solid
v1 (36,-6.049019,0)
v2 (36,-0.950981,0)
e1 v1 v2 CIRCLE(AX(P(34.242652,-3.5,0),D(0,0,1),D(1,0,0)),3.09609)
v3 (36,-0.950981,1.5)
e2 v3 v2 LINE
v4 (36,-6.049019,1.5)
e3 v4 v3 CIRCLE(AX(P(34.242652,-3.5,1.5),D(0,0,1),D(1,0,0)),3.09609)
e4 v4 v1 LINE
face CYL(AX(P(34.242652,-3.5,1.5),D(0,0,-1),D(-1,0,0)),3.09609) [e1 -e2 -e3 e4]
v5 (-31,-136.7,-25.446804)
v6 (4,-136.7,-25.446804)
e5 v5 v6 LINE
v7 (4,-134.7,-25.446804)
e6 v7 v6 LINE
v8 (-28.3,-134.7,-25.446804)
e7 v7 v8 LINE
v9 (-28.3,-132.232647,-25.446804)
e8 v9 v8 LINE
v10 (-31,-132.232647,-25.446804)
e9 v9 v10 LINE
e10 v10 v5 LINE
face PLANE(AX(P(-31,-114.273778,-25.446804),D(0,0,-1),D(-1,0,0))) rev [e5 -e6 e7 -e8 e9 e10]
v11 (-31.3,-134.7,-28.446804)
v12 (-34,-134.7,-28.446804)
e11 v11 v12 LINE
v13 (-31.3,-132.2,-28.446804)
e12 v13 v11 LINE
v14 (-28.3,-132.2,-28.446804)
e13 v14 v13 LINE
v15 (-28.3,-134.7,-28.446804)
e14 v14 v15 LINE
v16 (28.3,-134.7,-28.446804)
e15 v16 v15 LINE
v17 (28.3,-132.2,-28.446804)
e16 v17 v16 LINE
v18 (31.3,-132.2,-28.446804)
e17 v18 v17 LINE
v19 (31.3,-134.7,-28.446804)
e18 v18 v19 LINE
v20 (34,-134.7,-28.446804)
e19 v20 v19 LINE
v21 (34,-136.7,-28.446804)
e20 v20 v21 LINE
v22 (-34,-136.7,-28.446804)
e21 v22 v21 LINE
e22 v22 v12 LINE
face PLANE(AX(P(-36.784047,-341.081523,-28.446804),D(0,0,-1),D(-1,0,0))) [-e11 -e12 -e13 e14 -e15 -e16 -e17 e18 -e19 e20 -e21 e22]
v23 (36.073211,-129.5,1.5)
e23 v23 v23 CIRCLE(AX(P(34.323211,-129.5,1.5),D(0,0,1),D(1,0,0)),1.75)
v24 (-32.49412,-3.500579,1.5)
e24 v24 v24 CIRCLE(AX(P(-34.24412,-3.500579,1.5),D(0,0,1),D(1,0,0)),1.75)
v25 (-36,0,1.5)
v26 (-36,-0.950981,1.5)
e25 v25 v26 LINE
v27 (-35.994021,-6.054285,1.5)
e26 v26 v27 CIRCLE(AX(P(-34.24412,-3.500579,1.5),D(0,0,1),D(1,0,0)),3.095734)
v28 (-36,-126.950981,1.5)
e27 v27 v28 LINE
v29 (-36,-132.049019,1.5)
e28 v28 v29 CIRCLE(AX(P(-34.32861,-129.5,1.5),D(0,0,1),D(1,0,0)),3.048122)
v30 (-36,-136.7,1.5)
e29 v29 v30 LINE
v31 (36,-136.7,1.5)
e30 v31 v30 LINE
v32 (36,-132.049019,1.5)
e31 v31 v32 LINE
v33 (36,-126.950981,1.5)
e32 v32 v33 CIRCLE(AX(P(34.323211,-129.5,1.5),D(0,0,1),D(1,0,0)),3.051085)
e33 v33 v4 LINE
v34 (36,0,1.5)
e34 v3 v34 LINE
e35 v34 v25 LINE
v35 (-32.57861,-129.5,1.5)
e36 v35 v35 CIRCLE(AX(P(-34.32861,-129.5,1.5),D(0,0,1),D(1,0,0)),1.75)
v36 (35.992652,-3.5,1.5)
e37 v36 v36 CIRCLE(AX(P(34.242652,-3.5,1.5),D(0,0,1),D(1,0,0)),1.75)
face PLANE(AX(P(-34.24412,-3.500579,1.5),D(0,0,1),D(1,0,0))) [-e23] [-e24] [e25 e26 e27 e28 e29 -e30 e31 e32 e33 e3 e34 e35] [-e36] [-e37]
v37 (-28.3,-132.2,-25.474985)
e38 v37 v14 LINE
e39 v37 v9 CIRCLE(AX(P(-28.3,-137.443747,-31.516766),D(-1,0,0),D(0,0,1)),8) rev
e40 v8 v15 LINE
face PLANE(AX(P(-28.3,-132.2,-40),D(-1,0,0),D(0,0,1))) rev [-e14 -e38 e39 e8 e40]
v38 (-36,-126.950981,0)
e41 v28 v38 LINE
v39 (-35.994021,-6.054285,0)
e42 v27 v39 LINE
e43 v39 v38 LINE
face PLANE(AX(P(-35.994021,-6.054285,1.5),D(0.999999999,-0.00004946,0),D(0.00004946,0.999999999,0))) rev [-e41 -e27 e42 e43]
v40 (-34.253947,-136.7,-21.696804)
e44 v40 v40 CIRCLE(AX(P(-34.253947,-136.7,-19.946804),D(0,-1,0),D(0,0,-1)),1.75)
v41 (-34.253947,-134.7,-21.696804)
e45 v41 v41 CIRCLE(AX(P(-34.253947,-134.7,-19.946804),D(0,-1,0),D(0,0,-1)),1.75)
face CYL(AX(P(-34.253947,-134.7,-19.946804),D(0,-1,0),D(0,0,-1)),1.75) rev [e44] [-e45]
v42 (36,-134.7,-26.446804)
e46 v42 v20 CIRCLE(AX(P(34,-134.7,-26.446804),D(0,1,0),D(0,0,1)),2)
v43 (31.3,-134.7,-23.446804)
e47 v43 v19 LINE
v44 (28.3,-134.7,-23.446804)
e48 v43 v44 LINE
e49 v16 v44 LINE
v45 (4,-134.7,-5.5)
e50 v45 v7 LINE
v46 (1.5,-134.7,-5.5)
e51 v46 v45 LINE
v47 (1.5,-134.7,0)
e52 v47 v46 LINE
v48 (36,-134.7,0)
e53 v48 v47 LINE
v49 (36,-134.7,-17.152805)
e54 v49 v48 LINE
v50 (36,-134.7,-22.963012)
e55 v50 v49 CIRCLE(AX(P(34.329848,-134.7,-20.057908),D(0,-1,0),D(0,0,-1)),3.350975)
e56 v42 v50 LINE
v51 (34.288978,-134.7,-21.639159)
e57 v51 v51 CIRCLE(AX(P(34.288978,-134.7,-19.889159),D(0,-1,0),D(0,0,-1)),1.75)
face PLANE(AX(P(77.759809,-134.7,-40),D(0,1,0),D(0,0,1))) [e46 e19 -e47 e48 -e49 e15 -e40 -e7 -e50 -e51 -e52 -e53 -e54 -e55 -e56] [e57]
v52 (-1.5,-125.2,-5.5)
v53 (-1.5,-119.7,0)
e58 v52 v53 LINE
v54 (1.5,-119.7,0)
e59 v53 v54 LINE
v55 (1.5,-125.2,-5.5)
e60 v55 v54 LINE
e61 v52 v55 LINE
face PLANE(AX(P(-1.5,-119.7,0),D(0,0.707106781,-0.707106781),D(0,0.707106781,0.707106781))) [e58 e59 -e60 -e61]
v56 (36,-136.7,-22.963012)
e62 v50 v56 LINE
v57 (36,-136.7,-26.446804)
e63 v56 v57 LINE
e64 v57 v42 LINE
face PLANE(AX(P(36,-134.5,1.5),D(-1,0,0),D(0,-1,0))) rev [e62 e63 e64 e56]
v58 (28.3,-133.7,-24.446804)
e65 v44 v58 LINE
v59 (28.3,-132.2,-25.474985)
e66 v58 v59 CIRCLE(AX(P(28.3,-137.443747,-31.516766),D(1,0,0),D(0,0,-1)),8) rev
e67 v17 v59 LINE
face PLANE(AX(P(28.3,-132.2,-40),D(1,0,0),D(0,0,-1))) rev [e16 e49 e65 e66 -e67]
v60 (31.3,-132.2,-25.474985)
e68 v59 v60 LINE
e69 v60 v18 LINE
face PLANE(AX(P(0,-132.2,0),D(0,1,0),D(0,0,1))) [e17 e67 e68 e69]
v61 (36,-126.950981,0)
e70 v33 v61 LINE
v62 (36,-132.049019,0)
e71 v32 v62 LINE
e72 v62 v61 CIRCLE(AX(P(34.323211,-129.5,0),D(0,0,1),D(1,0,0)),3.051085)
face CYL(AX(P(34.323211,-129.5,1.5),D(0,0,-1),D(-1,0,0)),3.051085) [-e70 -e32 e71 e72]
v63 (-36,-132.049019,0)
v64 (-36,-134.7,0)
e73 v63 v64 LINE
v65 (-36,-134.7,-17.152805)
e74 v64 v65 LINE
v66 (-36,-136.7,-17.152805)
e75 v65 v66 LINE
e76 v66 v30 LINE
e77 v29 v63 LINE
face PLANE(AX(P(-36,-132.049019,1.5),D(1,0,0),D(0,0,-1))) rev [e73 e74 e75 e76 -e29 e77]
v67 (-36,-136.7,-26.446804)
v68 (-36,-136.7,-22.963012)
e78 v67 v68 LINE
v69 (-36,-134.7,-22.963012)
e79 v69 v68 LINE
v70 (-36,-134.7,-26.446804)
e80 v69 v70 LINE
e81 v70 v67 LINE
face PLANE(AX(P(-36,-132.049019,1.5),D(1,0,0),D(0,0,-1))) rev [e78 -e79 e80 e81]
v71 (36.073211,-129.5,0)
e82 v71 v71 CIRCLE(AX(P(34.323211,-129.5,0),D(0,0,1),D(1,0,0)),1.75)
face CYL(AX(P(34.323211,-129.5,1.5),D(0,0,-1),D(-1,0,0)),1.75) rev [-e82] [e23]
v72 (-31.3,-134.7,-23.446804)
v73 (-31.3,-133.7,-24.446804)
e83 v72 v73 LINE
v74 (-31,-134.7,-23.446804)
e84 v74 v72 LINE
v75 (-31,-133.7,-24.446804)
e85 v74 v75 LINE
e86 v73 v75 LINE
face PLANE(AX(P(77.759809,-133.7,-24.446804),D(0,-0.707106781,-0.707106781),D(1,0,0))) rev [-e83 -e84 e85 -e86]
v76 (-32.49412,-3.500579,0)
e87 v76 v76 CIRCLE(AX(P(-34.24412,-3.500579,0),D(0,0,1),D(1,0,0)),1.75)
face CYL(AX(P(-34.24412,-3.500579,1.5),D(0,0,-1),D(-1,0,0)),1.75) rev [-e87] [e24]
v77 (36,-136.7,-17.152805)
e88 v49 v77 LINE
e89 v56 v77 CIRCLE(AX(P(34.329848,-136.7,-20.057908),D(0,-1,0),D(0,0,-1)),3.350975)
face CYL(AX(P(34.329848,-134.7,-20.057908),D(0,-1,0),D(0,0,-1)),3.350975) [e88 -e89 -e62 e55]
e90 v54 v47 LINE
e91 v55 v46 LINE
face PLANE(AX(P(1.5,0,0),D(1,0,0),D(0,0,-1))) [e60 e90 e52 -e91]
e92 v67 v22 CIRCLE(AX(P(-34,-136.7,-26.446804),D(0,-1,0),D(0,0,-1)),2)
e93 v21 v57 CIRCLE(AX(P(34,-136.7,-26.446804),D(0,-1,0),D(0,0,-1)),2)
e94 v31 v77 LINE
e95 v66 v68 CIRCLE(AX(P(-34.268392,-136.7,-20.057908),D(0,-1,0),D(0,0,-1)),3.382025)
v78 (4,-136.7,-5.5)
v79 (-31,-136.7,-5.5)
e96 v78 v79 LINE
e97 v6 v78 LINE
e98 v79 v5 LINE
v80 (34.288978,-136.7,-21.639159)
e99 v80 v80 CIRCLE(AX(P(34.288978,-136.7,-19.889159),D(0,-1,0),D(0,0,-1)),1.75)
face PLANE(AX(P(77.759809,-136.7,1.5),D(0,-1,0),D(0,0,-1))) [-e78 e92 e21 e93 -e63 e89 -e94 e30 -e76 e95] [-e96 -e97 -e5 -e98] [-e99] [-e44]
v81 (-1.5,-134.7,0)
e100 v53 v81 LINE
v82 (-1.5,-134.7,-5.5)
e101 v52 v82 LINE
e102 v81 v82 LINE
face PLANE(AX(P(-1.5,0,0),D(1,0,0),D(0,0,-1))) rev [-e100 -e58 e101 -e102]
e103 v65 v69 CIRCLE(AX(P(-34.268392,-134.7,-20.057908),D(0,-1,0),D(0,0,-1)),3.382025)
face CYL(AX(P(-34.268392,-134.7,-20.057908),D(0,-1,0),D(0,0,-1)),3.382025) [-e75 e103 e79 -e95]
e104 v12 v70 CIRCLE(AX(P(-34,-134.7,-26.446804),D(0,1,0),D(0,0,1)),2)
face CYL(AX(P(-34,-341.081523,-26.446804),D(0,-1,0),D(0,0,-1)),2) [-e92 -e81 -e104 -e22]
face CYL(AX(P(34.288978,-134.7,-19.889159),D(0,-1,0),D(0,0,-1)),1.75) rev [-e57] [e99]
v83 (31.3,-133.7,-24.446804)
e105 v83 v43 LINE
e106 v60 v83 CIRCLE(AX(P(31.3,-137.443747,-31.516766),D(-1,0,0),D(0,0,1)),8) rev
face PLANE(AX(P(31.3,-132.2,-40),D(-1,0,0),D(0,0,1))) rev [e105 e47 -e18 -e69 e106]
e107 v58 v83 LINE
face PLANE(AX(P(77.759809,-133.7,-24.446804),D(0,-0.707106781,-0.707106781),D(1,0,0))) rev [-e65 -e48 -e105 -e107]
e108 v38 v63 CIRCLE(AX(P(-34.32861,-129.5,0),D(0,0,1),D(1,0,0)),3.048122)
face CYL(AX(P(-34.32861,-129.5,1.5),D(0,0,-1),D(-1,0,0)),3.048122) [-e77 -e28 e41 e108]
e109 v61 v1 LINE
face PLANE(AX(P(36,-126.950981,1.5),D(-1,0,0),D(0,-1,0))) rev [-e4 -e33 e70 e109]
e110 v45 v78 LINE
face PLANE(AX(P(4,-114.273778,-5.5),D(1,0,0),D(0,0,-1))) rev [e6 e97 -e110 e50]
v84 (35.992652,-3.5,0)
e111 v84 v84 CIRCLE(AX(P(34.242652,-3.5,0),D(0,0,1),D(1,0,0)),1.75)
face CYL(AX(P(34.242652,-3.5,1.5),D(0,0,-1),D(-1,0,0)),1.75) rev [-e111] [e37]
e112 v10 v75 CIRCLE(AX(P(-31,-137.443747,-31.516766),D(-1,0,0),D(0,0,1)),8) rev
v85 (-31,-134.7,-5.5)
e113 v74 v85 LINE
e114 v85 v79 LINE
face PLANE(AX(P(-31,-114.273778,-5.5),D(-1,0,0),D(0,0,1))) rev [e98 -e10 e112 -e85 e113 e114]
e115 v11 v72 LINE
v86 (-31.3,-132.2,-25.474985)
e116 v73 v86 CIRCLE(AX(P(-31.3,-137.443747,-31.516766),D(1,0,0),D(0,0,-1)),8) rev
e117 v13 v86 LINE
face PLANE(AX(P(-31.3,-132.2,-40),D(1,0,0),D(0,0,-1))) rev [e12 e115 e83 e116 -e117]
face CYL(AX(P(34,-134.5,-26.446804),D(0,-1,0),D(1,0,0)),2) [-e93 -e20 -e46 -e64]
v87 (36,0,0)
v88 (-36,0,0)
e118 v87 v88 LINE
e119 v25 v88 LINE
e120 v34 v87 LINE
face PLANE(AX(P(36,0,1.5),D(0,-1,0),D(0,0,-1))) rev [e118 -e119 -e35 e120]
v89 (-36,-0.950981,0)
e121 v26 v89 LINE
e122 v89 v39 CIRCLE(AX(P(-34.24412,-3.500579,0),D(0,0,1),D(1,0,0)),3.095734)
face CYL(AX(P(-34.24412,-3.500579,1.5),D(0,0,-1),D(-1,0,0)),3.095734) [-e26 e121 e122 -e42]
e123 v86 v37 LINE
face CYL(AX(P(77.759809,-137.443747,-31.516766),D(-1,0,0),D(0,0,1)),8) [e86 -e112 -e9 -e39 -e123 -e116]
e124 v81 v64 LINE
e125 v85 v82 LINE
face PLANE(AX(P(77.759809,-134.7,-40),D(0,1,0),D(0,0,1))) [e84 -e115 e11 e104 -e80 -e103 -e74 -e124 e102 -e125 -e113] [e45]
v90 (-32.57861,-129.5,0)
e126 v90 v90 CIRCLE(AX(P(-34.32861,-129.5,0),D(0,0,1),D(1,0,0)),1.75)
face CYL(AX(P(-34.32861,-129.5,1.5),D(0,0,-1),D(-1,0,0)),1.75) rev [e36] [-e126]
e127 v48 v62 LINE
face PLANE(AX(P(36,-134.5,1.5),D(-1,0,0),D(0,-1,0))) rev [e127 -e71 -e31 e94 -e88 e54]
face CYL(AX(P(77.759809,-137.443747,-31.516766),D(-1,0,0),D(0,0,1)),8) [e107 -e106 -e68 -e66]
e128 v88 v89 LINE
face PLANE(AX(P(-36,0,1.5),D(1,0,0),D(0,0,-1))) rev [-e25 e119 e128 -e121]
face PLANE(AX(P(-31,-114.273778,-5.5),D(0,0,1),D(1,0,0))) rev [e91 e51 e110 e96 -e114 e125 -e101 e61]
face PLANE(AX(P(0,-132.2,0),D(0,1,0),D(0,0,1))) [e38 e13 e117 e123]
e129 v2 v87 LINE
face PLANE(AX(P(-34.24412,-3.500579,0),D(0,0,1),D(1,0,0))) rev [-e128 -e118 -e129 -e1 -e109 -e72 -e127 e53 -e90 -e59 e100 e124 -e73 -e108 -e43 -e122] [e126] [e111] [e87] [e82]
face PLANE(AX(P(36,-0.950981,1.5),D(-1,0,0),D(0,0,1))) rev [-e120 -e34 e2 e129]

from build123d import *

# Parameters (mm, degrees)
SKETCH1_R                = 1.75
BOSS_EXTRUDE1_DEPTH      = 1.5
BOSS_EXTRUDE2_DEPTH      = 72
BOSS_EXTRUDE3_DEPTH      = 1.5
BOSS_EXTRUDE3_DEPTH_BACK = 1.5
BOSS_EXTRUDE4_DEPTH      = 2
SKETCH5_R                = 1.75
CUT_EXTRUDE1_DEPTH       = 2
CUT_EXTRUDE2_DEPTH       = 148.332054879
CUT_EXTRUDE2_DEPTH_BACK  = 148.332054879
SKETCH6_W                = 72
SKETCH6_H                = 11.553195909
BOSS_EXTRUDE6_START      = -2
SKETCH7_W                = 3
SKETCH7_H                = 4
BOSS_EXTRUDE6_DEPTH      = 2.5
FILLET1_R                = 2
CHAMFER1_SIZE            = 1
FILLET2_R                = 8
SKETCH8_W                = 35
SKETCH8_H                = 19.946804091
CUT_EXTRUDE3_DEPTH       = 22.4262221


with BuildPart() as part:
    # Sketch1 → Boss-Extrude1 (new body)
    with BuildSketch(Plane.XY):
        with BuildLine():
            Line((-31.5, -134.5), (31.5, -134.5))
            Line((31.5, -134.5), (36, -134.5))
            Line((36, -134.5), (36, -132.049019419))
            ThreePointArc((36, -132.049019419), (37.374296294, -129.5), (36, -126.950980581))
            Line((36, -126.950980581), (36, -6.049019419))
            ThreePointArc((36, -6.049019419), (37.33874188, -3.5), (36, -0.950980581))
            Line((36, -0.950980581), (36, 0))
            Line((36, 0), (-36, 0))
            Line((-36, 0), (-36, -0.950980581))
            ThreePointArc((-36, -0.950980581), (-37.339851511, -3.504206195), (-35.994020506, -6.054285021))
            Line((-35.994020506, -6.054285021), (-36, -126.950980581))
            ThreePointArc((-36, -126.950980581), (-37.376731289, -129.5), (-36, -132.049019419))
            Line((-36, -132.049019419), (-36, -134.5))
            Line((-36, -134.5), (-31.5, -134.5))
        make_face()
        with Locations((-34.328609587, -129.5)):
            Circle(SKETCH1_R, mode=Mode.SUBTRACT)
        with Locations((34.323211043, -129.5)):
            Circle(SKETCH1_R, mode=Mode.SUBTRACT)
        with Locations((34.242652207, -3.5)):
            Circle(SKETCH1_R, mode=Mode.SUBTRACT)
        with Locations((-34.244120111, -3.500578956)):
            Circle(SKETCH1_R, mode=Mode.SUBTRACT)
    extrude(amount=BOSS_EXTRUDE1_DEPTH)

    # Sketch2 → Boss-Extrude2 (add)
    with BuildSketch(Plane.ZY.offset(36)):
        Polygon((1.5, -134.5), (1.5, -136.7), (-40, -136.7), (-40, -134.7), (0, -134.7), (0, -134.5), (0, -132.049019419), (1.5, -132.049019419), align=None)
    extrude(amount=-BOSS_EXTRUDE2_DEPTH)

    # Sketch3 → Boss-Extrude3 (add, two sides: drawn at the far end of the back side and taken through both)
    with BuildSketch(Plane(origin=(0, 0, 0), x_dir=(0, 0, -1), z_dir=(1, 0, 0)).offset(-BOSS_EXTRUDE3_DEPTH_BACK)):
        Polygon((0, -119.7), (15, -134.7), (0, -134.7), align=None)
    extrude(amount=BOSS_EXTRUDE3_DEPTH + BOSS_EXTRUDE3_DEPTH_BACK)

    # Sketch4 → Boss-Extrude4 (add)
    with BuildSketch(Plane.XZ.offset(136.7)):
        with BuildLine():
            Line((-36, -17.152805247), (-36, -22.963011674))
            ThreePointArc((-36, -22.963011674), (-37.650416645, -20.05790846), (-36, -17.152805247))
        make_face()
        with BuildLine():
            Line((36, -17.152805247), (36, -22.963011674))
            ThreePointArc((36, -22.963011674), (37.68082264, -20.05790846), (36, -17.152805247))
        make_face()
    extrude(amount=-BOSS_EXTRUDE4_DEPTH)

    # Sketch5 → Cut-Extrude1 (cut)
    with BuildSketch(Plane.XZ.offset(136.7)):
        with Locations(Location((-34.253947115, -19.946804091, 0), (0, 0, 270))):
            Circle(SKETCH5_R)
        with Locations(Location((34.288977705, -19.889159472, 0), (0, 0, 270))):
            Circle(SKETCH5_R)
    extrude(amount=-CUT_EXTRUDE1_DEPTH, mode=Mode.SUBTRACT)

    # Sketch6 → Cut-Extrude2 (cut, two sides: drawn at the far end of the back side and taken through both)
    with BuildSketch(Plane.XZ.offset(136.7).offset(-CUT_EXTRUDE2_DEPTH_BACK)):
        with Locations((0, -34.223402046)):
            Rectangle(SKETCH6_W, SKETCH6_H)
    extrude(amount=CUT_EXTRUDE2_DEPTH + CUT_EXTRUDE2_DEPTH_BACK, mode=Mode.SUBTRACT)

    # Sketch7 → Boss-Extrude6 (add)
    with BuildSketch(Plane.XZ.offset(136.7).offset(BOSS_EXTRUDE6_START)):
        with Locations((-29.8, -26.446804091)):
            Rectangle(SKETCH7_W, SKETCH7_H)
        with Locations((29.8, -26.446804091)):
            Rectangle(SKETCH7_W, SKETCH7_H)
    extrude(amount=-BOSS_EXTRUDE6_DEPTH)

    # Fillet1
    fillet1_edges = [part.edges().sort_by_distance(p)[0] for p in [
        (36, -135.7, -28.446804091),
        (-36, -135.7, -28.446804091),
    ]]
    fillet(fillet1_edges, radius=FILLET1_R)

    # Chamfer1
    chamfer1_edges = [part.edges().sort_by_distance(p)[0] for p in [
        (-29.8, -134.7, -24.446804091),
        (-29.8, -132.2, -24.446804091),
        (29.8, -134.7, -24.446804091),
        (29.8, -132.2, -24.446804091),
    ]]
    chamfer(chamfer1_edges, length=CHAMFER1_SIZE)

    # Fillet2
    # the kernel refuses this fillet: 8 mm, written as the material it takes off along each edge
    with BuildSketch(Plane(origin=(-23.303909917, -133.2, -24.446804091), x_dir=(0, -1.0, -1.118394266079786e-11), z_dir=(-1, 0, 0))) as fillet2_piece_1:
        with BuildLine():
            CenterArc((4.243746579, -7.06996192), FILLET2_R, 117.902496562, 17.097503438)
            Line((-1.413107671, -1.413107671), (0, 0))
            Line((0, 0), (0.5, 0))
        make_face()
    extrude(amount=12.992180166, mode=Mode.SUBTRACT)
    with BuildSketch(Plane(origin=(23.303909917, -133.2, -24.446804091), x_dir=(0, 0.7071067811865476, -0.7071067811865476), z_dir=(1, 0, 0))) as fillet2_piece_2:
        with BuildLine():
            CenterArc((1.998436033, -8), FILLET2_R, 90, 17.097503438)
            Line((-0.353553391, -0.353553391), (0, 0))
            Line((0, 0), (1.998436033, 0))
        make_face()
    extrude(amount=12.992180166, mode=Mode.SUBTRACT)

    # Sketch8 → Cut-Extrude3 (cut)
    with BuildSketch(Plane.XZ.offset(136.7)):
        with Locations((-13.5, -15.473402046)):
            Rectangle(SKETCH8_W, SKETCH8_H)
    extrude(amount=-CUT_EXTRUDE3_DEPTH, mode=Mode.SUBTRACT)


solid = part.part
